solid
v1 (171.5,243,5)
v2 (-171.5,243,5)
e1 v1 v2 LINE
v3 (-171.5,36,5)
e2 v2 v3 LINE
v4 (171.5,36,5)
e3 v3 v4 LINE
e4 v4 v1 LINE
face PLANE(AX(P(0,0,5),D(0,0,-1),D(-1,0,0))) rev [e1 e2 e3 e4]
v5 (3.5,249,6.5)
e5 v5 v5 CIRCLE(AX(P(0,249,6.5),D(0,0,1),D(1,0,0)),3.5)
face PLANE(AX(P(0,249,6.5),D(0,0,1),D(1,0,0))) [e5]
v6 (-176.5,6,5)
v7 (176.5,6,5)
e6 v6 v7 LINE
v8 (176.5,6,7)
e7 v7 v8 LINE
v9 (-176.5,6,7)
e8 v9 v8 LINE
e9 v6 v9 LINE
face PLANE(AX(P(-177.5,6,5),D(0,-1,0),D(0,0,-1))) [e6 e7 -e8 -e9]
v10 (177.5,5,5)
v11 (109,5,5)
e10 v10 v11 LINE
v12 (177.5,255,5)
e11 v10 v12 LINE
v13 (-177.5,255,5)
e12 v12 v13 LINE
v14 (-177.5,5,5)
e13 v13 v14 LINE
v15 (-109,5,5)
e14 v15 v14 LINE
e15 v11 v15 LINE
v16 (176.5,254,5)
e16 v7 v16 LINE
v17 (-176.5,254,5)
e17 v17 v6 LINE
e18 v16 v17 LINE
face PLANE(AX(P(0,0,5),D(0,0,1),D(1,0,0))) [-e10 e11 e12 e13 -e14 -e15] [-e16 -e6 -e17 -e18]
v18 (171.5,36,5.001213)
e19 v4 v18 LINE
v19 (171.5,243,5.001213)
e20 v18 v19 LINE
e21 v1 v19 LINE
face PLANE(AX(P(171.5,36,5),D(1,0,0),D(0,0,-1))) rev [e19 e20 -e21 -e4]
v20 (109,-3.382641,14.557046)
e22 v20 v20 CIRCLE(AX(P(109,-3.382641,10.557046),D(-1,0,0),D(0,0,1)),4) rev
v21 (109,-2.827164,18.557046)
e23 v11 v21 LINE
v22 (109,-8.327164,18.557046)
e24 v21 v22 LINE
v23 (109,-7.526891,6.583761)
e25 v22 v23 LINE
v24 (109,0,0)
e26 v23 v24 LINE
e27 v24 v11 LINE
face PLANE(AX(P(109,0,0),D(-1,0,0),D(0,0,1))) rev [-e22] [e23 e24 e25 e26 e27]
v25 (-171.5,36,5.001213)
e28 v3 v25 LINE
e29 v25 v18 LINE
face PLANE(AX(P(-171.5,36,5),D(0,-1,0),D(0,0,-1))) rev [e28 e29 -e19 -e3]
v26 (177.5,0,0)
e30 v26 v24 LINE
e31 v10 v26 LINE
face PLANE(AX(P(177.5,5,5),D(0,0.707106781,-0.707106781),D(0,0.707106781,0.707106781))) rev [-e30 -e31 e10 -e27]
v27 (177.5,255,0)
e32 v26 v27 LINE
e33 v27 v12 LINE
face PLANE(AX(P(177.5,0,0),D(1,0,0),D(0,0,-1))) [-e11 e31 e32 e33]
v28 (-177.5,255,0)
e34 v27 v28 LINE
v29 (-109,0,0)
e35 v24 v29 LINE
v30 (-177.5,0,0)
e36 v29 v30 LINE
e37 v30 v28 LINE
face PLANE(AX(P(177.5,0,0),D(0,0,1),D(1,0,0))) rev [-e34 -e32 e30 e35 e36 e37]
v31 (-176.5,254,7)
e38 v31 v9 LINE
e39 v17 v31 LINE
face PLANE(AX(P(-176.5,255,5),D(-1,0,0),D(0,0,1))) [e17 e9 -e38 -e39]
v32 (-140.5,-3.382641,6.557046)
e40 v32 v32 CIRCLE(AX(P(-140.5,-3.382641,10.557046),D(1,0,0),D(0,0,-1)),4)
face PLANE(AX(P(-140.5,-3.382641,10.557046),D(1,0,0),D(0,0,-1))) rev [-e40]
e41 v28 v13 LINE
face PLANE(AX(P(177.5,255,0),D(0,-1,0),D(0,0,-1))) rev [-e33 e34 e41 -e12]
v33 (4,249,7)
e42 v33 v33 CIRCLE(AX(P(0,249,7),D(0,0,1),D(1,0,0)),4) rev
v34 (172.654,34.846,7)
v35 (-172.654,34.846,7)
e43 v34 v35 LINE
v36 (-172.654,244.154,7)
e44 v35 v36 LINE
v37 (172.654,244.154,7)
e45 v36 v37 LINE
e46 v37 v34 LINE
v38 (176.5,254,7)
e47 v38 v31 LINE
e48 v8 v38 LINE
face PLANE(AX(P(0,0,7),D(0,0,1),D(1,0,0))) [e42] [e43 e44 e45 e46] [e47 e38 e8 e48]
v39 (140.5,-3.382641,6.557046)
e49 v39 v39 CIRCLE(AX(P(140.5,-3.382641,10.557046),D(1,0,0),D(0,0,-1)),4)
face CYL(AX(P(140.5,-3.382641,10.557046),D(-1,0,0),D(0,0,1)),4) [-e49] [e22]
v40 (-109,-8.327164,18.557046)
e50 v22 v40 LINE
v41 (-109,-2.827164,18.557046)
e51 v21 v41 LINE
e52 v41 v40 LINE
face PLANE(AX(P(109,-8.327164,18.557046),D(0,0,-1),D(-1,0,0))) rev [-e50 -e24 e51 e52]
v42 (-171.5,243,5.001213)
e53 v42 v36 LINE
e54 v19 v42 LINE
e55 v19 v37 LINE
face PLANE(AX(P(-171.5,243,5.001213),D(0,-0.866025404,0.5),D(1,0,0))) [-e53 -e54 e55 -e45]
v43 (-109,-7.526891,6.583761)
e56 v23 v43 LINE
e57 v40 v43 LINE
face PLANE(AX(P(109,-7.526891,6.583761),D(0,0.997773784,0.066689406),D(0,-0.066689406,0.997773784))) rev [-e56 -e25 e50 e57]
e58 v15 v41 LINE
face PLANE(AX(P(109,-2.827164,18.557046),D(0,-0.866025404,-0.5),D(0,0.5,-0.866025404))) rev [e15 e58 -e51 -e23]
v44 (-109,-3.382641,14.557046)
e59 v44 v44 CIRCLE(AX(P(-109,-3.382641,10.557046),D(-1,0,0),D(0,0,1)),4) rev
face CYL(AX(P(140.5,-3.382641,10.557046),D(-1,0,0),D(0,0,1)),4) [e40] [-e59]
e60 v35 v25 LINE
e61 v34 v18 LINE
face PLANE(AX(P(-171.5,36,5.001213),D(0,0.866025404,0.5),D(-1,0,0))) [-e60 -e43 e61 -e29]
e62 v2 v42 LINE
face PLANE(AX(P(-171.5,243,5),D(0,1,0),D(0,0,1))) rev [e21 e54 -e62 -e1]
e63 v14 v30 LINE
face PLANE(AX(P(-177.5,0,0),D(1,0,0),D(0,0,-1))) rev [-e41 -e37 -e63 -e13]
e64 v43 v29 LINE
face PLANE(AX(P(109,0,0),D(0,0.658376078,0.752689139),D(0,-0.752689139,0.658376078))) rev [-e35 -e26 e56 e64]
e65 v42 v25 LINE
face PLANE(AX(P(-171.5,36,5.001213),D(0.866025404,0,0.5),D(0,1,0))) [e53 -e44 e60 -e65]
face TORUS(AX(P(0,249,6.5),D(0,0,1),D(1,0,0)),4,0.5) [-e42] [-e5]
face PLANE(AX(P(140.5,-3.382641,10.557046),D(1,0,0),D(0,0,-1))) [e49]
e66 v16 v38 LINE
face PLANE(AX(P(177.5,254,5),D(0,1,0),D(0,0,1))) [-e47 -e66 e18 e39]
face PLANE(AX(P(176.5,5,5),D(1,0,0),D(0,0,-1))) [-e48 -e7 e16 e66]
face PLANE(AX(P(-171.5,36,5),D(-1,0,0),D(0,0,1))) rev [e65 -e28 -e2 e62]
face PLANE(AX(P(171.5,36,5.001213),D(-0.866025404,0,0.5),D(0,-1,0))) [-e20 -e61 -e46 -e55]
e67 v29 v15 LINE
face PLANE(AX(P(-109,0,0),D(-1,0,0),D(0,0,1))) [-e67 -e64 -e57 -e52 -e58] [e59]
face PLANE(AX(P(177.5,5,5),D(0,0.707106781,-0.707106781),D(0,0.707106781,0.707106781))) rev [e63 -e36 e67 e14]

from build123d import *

# Parameters (mm, degrees)
EXTRUDE_1_DEPTH       = 177.5
EXTRUDE_2_DEPTH       = 109
EXTRUDE_3_DEPTH       = 2
SKETCH_5_W            = 355
SKETCH_5_H            = 250
SKETCH_5_W_2          = 353
SKETCH_5_H_2          = 248
CUT_EXTRUDE_1_DEPTH   = 2
SKETCH_6_W            = 343
SKETCH_6_H            = 207
CUT_EXTRUDE_1_2_DEPTH = 2
CHAMFER_1_SIZE        = 1.154
CHAMFER_1_SIZE2       = 1.998786632
SKETCH_7_R            = 3.5
CUT_EXTRUDE_2_DEPTH   = 0.5
FILLET_1_R            = 0.5
SKETCH_8_R            = 4
EXTRUDE_4_DEPTH       = 140.5


with BuildPart() as part:
    # 草图1 → 凸台-拉伸1 (new, symmetric)
    with BuildSketch(Plane(origin=(0, 0, 0), x_dir=(0, 0, -1), z_dir=(1, 0, 0))):
        Polygon((0, 0), (0, 255), (-5, 255), (-5, 5), align=None)
    extrude(amount=EXTRUDE_1_DEPTH, both=True)

    # 草图3 → 凸台-拉伸2 (add, symmetric)
    with BuildSketch(Plane(origin=(0, 0, 0), x_dir=(0, 0, -1), z_dir=(1, 0, 0))):
        Polygon((0, 0), (-6.583760775, -7.526891394), (-18.557046178, -8.32716426), (-18.557046178, -2.82716426), (-5, 5), align=None)
    extrude(amount=EXTRUDE_2_DEPTH, both=True)

    # 草图4 → 凸台-拉伸3 (add)
    with BuildSketch(Plane.XY.offset(5)):
        Polygon((-177.5, 255), (-177.5, 5), (-109, 5), (109, 5), (177.5, 5), (177.5, 255), align=None)
    extrude(amount=EXTRUDE_3_DEPTH)

    # 草图5 → Cut-Extrude 1 (cut)
    with BuildSketch(Plane.XY.offset(7)):
        with Locations((0, 130)):
            Rectangle(SKETCH_5_W, SKETCH_5_H)
        with Locations((0, 130)):
            Rectangle(SKETCH_5_W_2, SKETCH_5_H_2, mode=Mode.SUBTRACT)
    extrude(amount=-CUT_EXTRUDE_1_DEPTH, mode=Mode.SUBTRACT)

    # 草图6 → Cut-Extrude 1 2 (cut)
    with BuildSketch(Plane.XY.offset(7)):
        with Locations((0, 139.5)):
            Rectangle(SKETCH_6_W, SKETCH_6_H)
    extrude(amount=-CUT_EXTRUDE_1_2_DEPTH, mode=Mode.SUBTRACT)

    # 倒角1
    chamfer_1_edges = [part.edges().sort_by_distance(p)[0] for p in [
        (-171.5, 139.5, 7),
        (0, 36, 7),
        (171.5, 139.5, 7),
        (0, 243, 7),
    ]]
    chamfer_1_side = [part.faces().sort_by_distance(p)[0] for p in [
        (0, 10.314081594, 7),
    ]]
    chamfer(chamfer_1_edges, length=CHAMFER_1_SIZE, length2=CHAMFER_1_SIZE2, reference=chamfer_1_side[0])

    # 草图7 → 切除-拉伸2 (cut)
    with BuildSketch(Plane.XY.offset(7)):
        with Locations((0, 249)):
            Circle(SKETCH_7_R)
    extrude(amount=-CUT_EXTRUDE_2_DEPTH, mode=Mode.SUBTRACT)

    # 圆角1
    fillet_1_edges = [part.edges().sort_by_distance(p)[0] for p in [
        (-3.5, 249, 7),
    ]]
    fillet(fillet_1_edges, radius=FILLET_1_R - 0.0001)  # a hair under: the kernel refuses the full size

    # 草图8 → 凸台-拉伸4 (add, symmetric)
    with BuildSketch(Plane(origin=(0, 0, 0), x_dir=(0, 0, -1), z_dir=(1, 0, 0))):
        with Locations(Location((-10.557046178, -3.382641438, 0), (0, 0, 180))):
            Circle(SKETCH_8_R)
    extrude(amount=EXTRUDE_4_DEPTH, both=True)


solid = part.part
